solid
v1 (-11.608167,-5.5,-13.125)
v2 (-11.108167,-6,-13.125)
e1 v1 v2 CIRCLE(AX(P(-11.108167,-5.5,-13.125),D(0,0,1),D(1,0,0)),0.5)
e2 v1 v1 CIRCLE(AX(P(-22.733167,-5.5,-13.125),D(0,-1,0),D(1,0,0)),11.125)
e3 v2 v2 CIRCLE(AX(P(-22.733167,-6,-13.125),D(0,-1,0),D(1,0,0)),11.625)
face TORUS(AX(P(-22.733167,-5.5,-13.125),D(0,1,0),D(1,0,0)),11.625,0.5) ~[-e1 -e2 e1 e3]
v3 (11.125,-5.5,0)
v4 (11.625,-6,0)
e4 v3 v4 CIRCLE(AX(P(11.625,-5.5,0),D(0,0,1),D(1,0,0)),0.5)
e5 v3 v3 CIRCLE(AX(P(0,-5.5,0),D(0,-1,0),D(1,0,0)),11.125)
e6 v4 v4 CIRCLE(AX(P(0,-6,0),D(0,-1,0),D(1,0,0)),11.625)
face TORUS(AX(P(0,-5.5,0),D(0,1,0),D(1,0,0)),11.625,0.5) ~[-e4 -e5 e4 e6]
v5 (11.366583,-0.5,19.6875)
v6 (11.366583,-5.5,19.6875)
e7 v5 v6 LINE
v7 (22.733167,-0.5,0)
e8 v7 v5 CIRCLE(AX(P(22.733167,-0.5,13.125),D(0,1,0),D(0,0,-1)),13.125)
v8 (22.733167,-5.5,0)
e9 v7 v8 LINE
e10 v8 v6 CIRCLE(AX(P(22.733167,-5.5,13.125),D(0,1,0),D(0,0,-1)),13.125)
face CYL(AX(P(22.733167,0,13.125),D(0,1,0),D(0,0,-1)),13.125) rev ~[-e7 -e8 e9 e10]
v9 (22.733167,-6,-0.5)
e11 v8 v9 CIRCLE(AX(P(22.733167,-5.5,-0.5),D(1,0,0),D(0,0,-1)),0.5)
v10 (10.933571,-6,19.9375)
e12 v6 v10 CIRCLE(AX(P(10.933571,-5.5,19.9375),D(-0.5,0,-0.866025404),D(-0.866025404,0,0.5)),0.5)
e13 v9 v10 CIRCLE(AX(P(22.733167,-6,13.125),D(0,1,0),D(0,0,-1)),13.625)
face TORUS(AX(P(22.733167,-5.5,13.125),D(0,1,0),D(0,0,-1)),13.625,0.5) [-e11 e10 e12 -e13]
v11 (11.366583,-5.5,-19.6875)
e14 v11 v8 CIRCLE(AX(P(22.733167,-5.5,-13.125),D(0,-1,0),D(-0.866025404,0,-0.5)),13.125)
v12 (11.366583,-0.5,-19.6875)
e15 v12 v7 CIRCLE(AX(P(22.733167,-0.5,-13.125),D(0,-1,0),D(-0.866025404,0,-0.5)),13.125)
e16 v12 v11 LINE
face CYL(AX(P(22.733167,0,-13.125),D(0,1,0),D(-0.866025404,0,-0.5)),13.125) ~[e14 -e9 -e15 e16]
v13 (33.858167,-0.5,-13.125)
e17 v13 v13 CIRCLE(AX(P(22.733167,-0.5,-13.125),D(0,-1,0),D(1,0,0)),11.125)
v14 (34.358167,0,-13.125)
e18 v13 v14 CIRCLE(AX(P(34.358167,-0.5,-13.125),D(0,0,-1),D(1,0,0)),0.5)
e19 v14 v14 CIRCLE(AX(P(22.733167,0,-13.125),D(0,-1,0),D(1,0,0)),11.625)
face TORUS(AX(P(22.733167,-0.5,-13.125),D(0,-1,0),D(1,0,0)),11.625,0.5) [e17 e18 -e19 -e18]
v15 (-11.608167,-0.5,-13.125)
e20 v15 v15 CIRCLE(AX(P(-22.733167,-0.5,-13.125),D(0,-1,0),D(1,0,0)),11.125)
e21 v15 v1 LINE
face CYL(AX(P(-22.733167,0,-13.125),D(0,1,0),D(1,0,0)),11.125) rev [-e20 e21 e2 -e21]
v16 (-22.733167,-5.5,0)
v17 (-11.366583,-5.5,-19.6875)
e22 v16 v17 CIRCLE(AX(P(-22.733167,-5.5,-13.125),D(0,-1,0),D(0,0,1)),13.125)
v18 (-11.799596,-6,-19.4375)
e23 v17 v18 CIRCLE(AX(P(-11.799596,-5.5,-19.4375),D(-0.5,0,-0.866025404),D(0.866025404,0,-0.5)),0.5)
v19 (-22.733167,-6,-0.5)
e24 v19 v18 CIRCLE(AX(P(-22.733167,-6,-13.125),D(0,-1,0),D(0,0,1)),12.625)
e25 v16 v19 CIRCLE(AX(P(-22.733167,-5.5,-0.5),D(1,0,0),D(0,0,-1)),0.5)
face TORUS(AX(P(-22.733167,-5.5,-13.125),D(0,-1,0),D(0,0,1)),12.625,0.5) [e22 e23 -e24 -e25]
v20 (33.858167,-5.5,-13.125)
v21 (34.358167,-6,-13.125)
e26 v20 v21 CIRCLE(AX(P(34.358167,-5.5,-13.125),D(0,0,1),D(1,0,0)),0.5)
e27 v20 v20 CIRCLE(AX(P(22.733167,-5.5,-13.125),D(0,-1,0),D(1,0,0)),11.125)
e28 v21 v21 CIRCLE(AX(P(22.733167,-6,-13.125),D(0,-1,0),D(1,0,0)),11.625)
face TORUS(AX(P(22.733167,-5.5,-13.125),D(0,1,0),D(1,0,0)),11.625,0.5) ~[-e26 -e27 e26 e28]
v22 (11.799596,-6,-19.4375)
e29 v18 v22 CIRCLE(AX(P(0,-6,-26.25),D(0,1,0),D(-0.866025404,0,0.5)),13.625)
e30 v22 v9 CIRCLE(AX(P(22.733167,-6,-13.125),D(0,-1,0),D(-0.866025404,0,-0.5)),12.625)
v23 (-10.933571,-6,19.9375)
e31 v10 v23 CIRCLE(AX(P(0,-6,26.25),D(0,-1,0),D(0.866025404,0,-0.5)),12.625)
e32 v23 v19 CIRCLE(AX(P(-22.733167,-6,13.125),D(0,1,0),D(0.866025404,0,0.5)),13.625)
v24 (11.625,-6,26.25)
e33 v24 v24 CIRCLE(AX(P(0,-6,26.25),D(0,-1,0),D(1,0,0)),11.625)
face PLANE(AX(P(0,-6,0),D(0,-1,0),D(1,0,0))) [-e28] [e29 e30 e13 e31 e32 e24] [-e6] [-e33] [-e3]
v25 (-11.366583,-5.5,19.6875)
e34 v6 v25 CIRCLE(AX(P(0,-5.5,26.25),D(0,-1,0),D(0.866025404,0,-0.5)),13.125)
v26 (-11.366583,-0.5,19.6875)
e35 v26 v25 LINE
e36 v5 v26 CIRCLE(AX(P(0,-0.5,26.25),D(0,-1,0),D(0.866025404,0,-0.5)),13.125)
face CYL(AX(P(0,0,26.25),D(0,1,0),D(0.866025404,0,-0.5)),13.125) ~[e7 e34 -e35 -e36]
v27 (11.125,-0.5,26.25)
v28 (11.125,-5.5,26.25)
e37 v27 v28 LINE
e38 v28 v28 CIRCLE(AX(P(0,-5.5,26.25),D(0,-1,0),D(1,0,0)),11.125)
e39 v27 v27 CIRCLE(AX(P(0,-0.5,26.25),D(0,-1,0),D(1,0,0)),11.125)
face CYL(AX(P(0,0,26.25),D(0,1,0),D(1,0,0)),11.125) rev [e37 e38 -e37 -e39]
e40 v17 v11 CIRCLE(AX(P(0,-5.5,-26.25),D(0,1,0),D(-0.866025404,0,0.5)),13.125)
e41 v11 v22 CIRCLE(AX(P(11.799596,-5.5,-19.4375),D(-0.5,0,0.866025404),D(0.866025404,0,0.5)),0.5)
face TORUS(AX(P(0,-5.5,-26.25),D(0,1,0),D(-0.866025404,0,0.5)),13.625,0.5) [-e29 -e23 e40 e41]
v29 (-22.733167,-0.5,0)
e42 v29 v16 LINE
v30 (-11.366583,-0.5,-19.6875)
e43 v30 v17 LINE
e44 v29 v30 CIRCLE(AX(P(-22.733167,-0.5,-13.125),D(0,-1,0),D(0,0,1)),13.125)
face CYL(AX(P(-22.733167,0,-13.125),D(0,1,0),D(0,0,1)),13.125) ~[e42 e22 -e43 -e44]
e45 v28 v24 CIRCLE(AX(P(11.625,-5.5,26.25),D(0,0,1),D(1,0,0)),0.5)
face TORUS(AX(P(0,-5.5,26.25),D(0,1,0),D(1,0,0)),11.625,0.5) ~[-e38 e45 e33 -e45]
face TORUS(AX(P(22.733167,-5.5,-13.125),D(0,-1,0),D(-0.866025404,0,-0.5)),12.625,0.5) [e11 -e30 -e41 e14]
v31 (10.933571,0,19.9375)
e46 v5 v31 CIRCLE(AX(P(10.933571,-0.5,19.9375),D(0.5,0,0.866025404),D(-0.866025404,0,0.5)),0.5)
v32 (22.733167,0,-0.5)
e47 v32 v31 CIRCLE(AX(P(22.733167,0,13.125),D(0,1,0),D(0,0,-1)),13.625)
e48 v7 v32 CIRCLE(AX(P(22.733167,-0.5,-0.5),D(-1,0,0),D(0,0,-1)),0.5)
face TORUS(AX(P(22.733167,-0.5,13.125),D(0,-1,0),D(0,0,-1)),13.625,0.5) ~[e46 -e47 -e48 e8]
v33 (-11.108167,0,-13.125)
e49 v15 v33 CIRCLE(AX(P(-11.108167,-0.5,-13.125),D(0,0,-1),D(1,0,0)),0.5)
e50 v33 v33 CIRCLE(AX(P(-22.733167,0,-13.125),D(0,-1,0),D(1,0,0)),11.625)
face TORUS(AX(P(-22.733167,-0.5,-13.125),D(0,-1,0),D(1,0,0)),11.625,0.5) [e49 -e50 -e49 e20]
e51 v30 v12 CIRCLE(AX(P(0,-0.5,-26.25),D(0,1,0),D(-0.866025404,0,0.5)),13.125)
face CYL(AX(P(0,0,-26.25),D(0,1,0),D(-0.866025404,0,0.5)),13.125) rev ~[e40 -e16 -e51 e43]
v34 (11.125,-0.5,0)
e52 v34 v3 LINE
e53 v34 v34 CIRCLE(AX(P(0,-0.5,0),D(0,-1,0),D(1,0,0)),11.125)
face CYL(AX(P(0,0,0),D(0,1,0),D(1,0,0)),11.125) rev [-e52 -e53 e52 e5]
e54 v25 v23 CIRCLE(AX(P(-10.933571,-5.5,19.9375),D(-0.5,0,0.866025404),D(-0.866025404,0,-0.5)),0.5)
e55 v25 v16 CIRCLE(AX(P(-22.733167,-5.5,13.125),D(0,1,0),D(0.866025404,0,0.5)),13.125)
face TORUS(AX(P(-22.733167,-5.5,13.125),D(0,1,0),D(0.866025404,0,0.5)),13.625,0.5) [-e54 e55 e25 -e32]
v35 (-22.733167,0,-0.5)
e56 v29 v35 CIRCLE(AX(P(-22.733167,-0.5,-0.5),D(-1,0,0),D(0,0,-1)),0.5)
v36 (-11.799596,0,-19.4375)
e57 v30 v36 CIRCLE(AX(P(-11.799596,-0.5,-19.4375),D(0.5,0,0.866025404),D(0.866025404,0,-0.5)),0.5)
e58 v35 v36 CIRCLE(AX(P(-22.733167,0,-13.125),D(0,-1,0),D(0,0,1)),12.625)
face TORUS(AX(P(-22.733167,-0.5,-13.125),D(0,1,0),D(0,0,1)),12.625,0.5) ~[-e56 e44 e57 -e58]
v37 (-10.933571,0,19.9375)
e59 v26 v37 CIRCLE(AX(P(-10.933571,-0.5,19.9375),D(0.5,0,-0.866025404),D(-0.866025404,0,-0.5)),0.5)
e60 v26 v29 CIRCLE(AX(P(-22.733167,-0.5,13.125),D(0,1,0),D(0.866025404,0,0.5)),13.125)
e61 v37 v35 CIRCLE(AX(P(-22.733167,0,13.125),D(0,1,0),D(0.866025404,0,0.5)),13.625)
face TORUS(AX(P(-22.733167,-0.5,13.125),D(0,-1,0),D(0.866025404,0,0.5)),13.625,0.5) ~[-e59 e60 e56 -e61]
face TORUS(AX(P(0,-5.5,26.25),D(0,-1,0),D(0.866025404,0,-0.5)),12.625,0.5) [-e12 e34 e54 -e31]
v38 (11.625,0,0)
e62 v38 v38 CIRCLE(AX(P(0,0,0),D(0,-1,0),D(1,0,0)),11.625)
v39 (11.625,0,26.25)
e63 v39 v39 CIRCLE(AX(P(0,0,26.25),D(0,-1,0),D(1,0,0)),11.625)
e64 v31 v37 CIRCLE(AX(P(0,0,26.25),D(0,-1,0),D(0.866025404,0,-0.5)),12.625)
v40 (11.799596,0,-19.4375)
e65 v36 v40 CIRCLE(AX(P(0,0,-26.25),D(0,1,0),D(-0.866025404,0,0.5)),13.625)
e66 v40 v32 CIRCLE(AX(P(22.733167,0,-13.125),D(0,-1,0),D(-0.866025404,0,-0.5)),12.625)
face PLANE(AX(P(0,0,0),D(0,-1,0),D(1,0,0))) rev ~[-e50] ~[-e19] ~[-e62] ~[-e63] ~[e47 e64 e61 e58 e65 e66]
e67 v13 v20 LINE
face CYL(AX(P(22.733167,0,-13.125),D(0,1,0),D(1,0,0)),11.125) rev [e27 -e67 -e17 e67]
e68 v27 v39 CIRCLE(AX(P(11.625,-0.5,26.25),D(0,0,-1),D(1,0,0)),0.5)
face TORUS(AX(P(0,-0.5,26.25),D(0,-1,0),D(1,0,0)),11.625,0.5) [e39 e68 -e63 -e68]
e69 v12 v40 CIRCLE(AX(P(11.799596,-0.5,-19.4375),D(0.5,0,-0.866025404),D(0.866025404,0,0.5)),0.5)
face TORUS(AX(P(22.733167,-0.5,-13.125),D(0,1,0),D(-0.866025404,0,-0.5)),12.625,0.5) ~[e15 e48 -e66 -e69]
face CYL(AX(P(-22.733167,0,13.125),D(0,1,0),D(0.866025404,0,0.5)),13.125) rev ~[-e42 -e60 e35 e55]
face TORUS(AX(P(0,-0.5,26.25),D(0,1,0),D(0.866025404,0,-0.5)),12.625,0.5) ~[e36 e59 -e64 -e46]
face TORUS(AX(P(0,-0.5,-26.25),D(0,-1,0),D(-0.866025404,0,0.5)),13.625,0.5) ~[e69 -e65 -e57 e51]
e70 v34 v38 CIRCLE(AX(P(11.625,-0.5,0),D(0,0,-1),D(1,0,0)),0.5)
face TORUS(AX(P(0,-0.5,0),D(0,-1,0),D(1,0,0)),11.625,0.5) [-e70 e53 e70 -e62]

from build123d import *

# Parameters (mm, degrees)
F1_R     = 11.125
F2_DEPTH = 6
F3_R     = 0.5


# Not quite as in the source:
# - a feature names something its author has since deleted; it is built from what else it names


with BuildPart() as f2:
    # F1 (on Front) → F2 (new body)
    with BuildSketch(Plane.XZ):
        with BuildLine():
            ThreePointArc((-11.3665834247, 19.6875), (-11.3665834247, 6.5625), (-22.7331668493, 0))
            ThreePointArc((-22.7331668493, 0), (-34.099750274, -19.6875), (-11.3665834247, -19.6875))
            ThreePointArc((-11.3665834247, -19.6875), (0, -13.125), (11.3665834247, -19.6875))
            ThreePointArc((11.3665834247, -19.6875), (34.099750274, -19.6875), (22.7331668493, 0))
            ThreePointArc((22.7331668493, 0), (11.3665834247, 6.5625), (11.3665834247, 19.6875))
            ThreePointArc((11.3665834247, 19.6875), (0, 39.375), (-11.3665834247, 19.6875))
        make_face()
        with Locations((-22.7331668493, -13.125)):
            Circle(F1_R, mode=Mode.SUBTRACT)
        Circle(F1_R, mode=Mode.SUBTRACT)
        with Locations((22.7331668493, -13.125)):
            Circle(F1_R, mode=Mode.SUBTRACT)
        with Locations((0, 26.25)):
            Circle(F1_R, mode=Mode.SUBTRACT)
    extrude(amount=F2_DEPTH)

    # F3
    f3_edges = [f2.edges().sort_by_distance(p)[0] for p in [
        (11.366583, -6, 6.5625),
        (0, -6, 39.375),
        (-11.366583, -6, 6.5625),
        (-34.09975, -6, -19.6875),
        (0, -6, -13.125),
        (34.09975, -6, -19.6875),
        (-33.858167, -6, -13.125),
        (-11.125, -6, 0),
        (11.608167, -6, -13.125),
        (-11.125, -6, 26.25),
        (11.366583, 0, 6.5625),
        (0, 0, 39.375),
        (-11.366583, 0, 6.5625),
        (-34.09975, 0, -19.6875),
        (0, 0, -13.125),
        (34.09975, 0, -19.6875),
        (-33.858167, 0, -13.125),
        (-11.125, 0, 0),
        (11.608167, 0, -13.125),
        (-11.125, 0, 26.25),
    ]]
    fillet(f3_edges, radius=F3_R)


solid = f2.part
